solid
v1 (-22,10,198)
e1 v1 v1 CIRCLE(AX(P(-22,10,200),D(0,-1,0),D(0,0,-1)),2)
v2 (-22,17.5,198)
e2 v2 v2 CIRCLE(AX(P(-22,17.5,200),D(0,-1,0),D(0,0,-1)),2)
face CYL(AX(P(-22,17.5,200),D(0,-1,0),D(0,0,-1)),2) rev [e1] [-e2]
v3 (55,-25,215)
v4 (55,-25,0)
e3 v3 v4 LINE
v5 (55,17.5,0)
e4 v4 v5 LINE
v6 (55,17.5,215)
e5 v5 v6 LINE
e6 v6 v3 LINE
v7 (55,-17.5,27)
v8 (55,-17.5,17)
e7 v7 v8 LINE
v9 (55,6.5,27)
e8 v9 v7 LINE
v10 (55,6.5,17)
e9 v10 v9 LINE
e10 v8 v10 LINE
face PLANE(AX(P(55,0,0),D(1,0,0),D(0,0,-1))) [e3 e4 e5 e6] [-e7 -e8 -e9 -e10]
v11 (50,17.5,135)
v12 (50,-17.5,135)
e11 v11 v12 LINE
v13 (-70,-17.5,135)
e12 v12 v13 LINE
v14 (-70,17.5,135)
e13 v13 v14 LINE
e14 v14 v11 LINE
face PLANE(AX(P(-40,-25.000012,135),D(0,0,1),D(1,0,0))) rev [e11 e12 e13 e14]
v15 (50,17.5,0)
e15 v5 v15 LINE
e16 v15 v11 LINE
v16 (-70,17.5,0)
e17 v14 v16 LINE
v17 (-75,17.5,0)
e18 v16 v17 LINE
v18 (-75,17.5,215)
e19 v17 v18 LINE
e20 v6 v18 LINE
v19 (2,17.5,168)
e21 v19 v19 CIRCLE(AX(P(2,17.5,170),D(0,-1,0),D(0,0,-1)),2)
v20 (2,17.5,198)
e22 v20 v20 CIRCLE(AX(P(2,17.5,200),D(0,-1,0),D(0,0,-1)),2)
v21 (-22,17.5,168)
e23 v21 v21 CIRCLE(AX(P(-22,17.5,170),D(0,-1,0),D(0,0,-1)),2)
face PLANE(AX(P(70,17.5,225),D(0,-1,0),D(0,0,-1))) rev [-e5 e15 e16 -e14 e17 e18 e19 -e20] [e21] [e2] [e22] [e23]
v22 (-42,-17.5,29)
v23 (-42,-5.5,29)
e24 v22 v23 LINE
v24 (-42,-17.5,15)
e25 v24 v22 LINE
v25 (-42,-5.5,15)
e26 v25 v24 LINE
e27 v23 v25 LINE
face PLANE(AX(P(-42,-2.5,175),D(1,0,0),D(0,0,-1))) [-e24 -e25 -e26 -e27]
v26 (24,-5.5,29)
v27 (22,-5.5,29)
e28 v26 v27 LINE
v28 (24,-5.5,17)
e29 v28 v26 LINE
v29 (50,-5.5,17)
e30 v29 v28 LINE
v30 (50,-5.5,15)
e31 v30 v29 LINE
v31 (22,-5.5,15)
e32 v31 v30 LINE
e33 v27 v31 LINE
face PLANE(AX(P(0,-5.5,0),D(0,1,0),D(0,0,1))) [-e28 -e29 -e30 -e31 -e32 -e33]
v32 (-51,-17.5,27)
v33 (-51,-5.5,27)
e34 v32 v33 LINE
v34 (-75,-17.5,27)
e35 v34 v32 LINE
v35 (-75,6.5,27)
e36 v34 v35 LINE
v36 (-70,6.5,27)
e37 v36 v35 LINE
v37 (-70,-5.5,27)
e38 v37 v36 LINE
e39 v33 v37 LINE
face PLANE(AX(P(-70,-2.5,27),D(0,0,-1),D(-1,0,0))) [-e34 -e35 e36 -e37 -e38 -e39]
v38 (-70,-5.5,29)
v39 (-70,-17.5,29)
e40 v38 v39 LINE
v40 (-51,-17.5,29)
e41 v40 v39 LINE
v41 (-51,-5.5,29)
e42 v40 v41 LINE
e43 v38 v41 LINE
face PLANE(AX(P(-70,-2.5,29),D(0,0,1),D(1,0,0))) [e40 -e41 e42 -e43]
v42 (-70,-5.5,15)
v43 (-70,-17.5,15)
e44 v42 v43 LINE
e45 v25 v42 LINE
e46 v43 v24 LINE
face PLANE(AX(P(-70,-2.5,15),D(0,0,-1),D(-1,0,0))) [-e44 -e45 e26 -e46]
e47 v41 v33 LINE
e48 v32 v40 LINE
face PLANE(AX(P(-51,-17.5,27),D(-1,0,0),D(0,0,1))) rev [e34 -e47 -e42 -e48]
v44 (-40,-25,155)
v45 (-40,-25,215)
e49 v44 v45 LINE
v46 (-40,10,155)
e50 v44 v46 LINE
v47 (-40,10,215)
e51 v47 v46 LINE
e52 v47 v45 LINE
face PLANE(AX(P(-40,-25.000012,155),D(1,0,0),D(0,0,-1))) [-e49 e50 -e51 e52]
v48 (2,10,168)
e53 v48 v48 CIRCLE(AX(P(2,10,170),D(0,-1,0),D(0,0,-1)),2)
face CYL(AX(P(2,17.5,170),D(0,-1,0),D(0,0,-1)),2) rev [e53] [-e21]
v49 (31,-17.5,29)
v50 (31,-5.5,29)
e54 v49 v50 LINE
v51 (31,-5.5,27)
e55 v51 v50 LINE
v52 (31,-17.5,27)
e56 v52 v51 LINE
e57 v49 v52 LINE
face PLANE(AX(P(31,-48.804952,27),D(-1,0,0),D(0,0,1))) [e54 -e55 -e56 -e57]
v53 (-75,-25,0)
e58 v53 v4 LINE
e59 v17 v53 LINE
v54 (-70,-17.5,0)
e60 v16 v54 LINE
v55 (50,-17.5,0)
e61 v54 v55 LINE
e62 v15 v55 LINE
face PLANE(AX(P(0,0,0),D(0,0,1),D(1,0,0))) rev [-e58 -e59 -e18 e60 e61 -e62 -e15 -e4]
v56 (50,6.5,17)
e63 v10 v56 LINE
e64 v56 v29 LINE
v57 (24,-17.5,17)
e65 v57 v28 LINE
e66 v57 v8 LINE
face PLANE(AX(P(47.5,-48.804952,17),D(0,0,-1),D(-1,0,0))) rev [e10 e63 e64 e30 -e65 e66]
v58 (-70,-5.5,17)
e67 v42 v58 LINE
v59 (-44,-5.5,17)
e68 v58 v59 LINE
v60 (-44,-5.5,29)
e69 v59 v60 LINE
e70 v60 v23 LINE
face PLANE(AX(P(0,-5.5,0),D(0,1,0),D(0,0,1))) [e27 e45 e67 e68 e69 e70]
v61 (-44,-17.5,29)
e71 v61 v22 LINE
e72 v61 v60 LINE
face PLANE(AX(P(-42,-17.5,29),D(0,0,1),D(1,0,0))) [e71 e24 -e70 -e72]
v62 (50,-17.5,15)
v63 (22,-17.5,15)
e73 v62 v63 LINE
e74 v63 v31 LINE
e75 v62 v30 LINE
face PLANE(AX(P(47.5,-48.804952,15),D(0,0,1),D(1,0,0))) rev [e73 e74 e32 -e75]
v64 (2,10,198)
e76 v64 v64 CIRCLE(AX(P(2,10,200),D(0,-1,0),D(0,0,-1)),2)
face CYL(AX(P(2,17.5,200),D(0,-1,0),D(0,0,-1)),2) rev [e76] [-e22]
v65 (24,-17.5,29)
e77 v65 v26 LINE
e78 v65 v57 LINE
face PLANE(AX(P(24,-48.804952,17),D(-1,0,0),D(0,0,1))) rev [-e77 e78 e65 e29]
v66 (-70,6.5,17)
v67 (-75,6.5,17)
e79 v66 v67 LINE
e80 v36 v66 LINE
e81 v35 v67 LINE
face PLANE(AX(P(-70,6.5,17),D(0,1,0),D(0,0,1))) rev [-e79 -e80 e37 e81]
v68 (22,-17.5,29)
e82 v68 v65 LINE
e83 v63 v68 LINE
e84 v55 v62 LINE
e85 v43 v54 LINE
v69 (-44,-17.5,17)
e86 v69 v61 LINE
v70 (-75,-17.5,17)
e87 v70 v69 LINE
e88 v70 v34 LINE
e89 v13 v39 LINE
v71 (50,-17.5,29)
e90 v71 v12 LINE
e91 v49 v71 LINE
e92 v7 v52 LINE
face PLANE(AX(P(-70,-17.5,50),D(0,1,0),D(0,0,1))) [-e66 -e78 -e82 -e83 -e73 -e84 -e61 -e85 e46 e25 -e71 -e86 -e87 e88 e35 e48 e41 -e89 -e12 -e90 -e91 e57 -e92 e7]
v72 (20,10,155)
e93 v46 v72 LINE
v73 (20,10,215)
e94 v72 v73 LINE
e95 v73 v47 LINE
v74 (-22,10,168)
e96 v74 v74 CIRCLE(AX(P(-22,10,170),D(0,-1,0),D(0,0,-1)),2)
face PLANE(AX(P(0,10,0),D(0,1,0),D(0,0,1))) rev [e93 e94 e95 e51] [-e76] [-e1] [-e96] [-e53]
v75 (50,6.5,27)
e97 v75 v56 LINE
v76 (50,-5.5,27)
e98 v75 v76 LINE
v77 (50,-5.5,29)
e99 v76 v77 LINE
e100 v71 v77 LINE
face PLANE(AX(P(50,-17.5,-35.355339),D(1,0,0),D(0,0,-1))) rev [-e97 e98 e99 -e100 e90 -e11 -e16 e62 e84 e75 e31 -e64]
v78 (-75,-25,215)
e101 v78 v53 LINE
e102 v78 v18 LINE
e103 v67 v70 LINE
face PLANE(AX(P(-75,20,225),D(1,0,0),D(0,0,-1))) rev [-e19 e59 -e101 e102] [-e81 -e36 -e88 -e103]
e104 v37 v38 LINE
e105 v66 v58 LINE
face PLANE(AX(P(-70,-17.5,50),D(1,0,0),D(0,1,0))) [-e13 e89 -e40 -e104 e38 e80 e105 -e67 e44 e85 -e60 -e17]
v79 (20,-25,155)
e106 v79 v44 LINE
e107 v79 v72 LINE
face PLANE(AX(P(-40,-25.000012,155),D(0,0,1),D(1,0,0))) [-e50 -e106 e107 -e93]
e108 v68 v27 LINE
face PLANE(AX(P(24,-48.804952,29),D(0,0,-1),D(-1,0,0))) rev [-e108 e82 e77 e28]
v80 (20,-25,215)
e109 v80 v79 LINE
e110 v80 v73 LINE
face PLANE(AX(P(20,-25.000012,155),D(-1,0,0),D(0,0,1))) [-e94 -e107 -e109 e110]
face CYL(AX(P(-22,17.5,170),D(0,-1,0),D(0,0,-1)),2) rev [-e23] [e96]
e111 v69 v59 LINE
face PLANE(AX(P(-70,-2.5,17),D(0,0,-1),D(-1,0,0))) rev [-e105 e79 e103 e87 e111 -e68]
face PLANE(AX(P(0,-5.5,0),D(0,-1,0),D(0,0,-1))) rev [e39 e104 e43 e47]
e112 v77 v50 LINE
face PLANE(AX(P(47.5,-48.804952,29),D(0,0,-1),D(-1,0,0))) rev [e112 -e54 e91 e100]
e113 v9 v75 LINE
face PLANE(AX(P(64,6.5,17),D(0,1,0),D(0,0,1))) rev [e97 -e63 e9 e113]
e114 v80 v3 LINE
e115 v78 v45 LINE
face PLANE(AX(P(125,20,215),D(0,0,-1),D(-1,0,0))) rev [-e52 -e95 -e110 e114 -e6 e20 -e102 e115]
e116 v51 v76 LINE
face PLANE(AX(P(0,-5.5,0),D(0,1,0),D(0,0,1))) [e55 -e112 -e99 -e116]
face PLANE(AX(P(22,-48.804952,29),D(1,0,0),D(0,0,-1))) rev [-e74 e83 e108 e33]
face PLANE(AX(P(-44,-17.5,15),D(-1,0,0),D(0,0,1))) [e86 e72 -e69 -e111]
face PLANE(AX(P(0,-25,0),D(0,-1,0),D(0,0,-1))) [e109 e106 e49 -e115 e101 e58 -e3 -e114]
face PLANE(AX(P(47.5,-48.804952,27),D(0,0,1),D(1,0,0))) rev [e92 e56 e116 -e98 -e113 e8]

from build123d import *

# Parameters (mm, degrees)
SKETCH2_W                = 150
SKETCH2_H                = 40
BOSS_EXTRUDE1_DEPTH      = 225
SKETCH3_W                = 140
SKETCH3_H                = 35
CUT_EXTRUDE1_DEPTH       = 50
SKETCH4_W                = 26
SKETCH4_H                = 2
SKETCH4_W_2              = 20
BOSS_EXTRUDE2_DEPTH      = 15
SKETCH6_W                = 10
SKETCH6_H                = 15
CUT_EXTRUDE2_DEPTH       = 15
CUT_EXTRUDE3_DEPTH       = 67
SKETCH9_W                = 10
SKETCH9_H                = 15
CUT_EXTRUDE4_DEPTH       = 67
SKETCH12_W               = 14
SKETCH12_H               = 2
BOSS_EXTRUDE3_DEPTH      = 2.5
FILLET1_R                = 0.5
MIRROR3_START            = 196
MIRROR3_DEPTH            = 14
MIRROR3_START_2          = 15
MIRROR3_2_DEPTH          = 14
MIRROR3_3_DEPTH          = 2
MIRROR3_START_3          = 208
MIRROR3_4_DEPTH          = 2
MIRROR3_5_DEPTH          = 2
MIRROR3_START_4          = 27
MIRROR3_6_DEPTH          = 2
SKETCH16_W               = 32.5
SKETCH16_H               = 11.5
BOSS_EXTRUDE5_DEPTH      = 5
SKETCH17_R               = 1
BOSS_EXTRUDE7_DEPTH      = 25
SKETCH18_W               = 5
SKETCH18_H               = 50
SKETCH18_W_2             = 10
SKETCH18_H_2             = 5
BOSS_EXTRUDE8_DEPTH      = 7.5
SKETCH24_W               = 5.5
SKETCH24_H               = 28
BOSS_EXTRUDE11_DEPTH     = 50
SKETCH25_W               = 5
SKETCH25_H               = 28
BOSS_EXTRUDE12_DEPTH     = 190
SKETCH26_W               = 5
SKETCH26_H               = 28
BOSS_EXTRUDE13_DEPTH     = 190
SKETCH27_R               = 2.55
BOSS_EXTRUDE14_DEPTH     = 10
SKETCH29_W               = 10
SKETCH29_H               = 15
CUT_EXTRUDE5_DEPTH       = 19
SKETCH30_W               = 15
SKETCH30_H               = 20
BOSS_EXTRUDE15_DEPTH     = 7.5
SKETCH33_W               = 140
SKETCH33_H               = 35
BOSS_EXTRUDE16_DEPTH     = 50
BOSS_EXTRUDE18_DEPTH     = 5
CUT_EXTRUDE9_DEPTH       = 303.293317822
CUT_EXTRUDE9_DEPTH_BACK  = 303.293317822
SKETCH37_W               = 10
SKETCH37_H               = 45
SKETCH41_W               = 150
SKETCH41_H               = 50
CUT_EXTRUDE12_DEPTH      = 2.5
SKETCH42_W               = 2
SKETCH42_H               = 12
CUT_EXTRUDE13_DEPTH      = 15
SKETCH43_W               = 1
SKETCH43_H               = 2
CUT_EXTRUDE14_DEPTH      = 15
SKETCH44_W               = 10
SKETCH44_H               = 3
BOSS_EXTRUDE19_DEPTH     = 5
SKETCH45_W               = 10
SKETCH45_H               = 3
BOSS_EXTRUDE20_DEPTH     = 5
SKETCH46_W               = 65.791508331
SKETCH46_H               = 202.821994136
SKETCH46_W_2             = 83.130638558
CUT_EXTRUDE15_DEPTH      = 257.527288997
SKETCH50_W               = 14
SKETCH50_H               = 2
CUT_EXTRUDE18_DEPTH      = 2.5
SKETCH51_W               = 2
SKETCH51_H               = 14
BOSS_EXTRUDE21_DEPTH     = 15
SKETCH52_W               = 19
SKETCH52_H               = 2
CUT_EXTRUDE19_DEPTH      = 3
SKETCH53_W               = 10
SKETCH53_H               = 12
CUT_EXTRUDE20_DEPTH      = 5
SKETCH54_W               = 14
SKETCH54_H               = 2
CUT_EXTRUDE21_DEPTH      = 2.5
SKETCH55_W               = 1.5
SKETCH55_H               = 2
CUT_EXTRUDE22_DEPTH      = 15
SKETCH56_W               = 2
SKETCH56_H               = 14
BOSS_EXTRUDE22_DEPTH     = 15
SKETCH57_W               = 17.5
SKETCH57_H               = 2
CUT_EXTRUDE23_DEPTH      = 3
SKETCH58_W               = 1.5
SKETCH58_H               = 2
BOSS_EXTRUDE23_DEPTH     = 12
SKETCH59_W               = 10
SKETCH59_H               = 12
CUT_EXTRUDE24_DEPTH      = 5
SKETCH61_W               = 150
SKETCH61_H               = 32.5
CUT_EXTRUDE26_DEPTH      = 230.360524066
SKETCH63_W               = 150
SKETCH63_H               = 165
CUT_EXTRUDE27_DEPTH      = 10
SKETCH71_W               = 215
SKETCH71_H               = 42.5
CUT_EXTRUDE28_DEPTH      = 85
BOSS_EXTRUDE26_DEPTH     = 65
SKETCH73_W               = 10
SKETCH73_H               = 15
BOSS_EXTRUDE27_DEPTH     = 5
BOSS_EXTRUDE28_REACH     = 233.815
BOSS_EXTRUDE28_START     = -3
SKETCH74_W               = 5
SKETCH74_H               = 35
BOSS_EXTRUDE29_DEPTH     = 50
SKETCH75_W               = 10
SKETCH75_H               = 24
CUT_EXTRUDE29_DEPTH      = 14
CUT_EXTRUDE30_DEPTH      = 232.638187698
CUT_EXTRUDE30_DEPTH_BACK = 232.638187698
SKETCH76_R               = 2
CUT_EXTRUDE31_START      = -40
CUT_EXTRUDE31_OUTLINE_W  = 35
CUT_EXTRUDE31_OUTLINE_H  = 60
CUT_EXTRUDE31_DEPTH      = 60
SKETCH78_W               = 120
SKETCH78_H               = 35
CUT_EXTRUDE32_DEPTH      = 85


# Read off the part's stored shape, not the designer's step: Mirror3, Cut-Extrude31
with BuildPart() as part:
    # Sketch2 → Boss-Extrude1 (new body)
    with BuildSketch(Plane.XY):
        Rectangle(SKETCH2_W, SKETCH2_H)
    extrude(amount=BOSS_EXTRUDE1_DEPTH)

    # Sketch3 → Cut-Extrude1 (cut)
    with BuildSketch(Plane.XY.offset(225)):
        Rectangle(SKETCH3_W, SKETCH3_H)
    cut_extrude1 = extrude(amount=-CUT_EXTRUDE1_DEPTH, mode=Mode.SUBTRACT)

    # Sketch4 → Boss-Extrude2 (add)
    with BuildSketch(Plane(origin=(0, -17.5, 0), x_dir=(1, 0, 0), z_dir=(0, 1, 0))):
        Polygon((-42, -196), (-44, -196), (-44, -208), (-44, -210), (-42, -210), align=None)
        with Locations((-57, -209)):
            Rectangle(SKETCH4_W, SKETCH4_H)
        with Locations((-60, -197)):
            Rectangle(SKETCH4_W_2, SKETCH4_H)
        Polygon((70, -210), (70, -208), (44, -208), (44, -196), (42, -196), (42, -210), (44, -210), align=None)
        with Locations((60, -197)):
            Rectangle(SKETCH4_W_2, SKETCH4_H)
    boss_extrude2 = extrude(amount=BOSS_EXTRUDE2_DEPTH)

    # Sketch6 → Cut-Extrude2 (cut)
    with BuildSketch(Plane(origin=(-70, 0, 0), x_dir=(0, 0, -1), z_dir=(1, 0, 0))):
        with Locations((-203, -10)):
            Rectangle(SKETCH6_W, SKETCH6_H)
    cut_extrude2 = extrude(amount=-CUT_EXTRUDE2_DEPTH, mode=Mode.SUBTRACT)

    # Sketch8 → Cut-Extrude3 (cut)
    with BuildSketch(Plane(origin=(0, -17.5, 0), x_dir=(1, 0, 0), z_dir=(0, 1, 0))):
        with BuildLine():
            Line((-64.5, -179.5), (-49.5, -179.5))
            ThreePointArc((-49.5, -179.5), (-46, -183), (-49.5, -186.5))
            Line((-49.5, -186.5), (-64.5, -186.5))
            ThreePointArc((-64.5, -186.5), (-68, -183), (-64.5, -179.5))
        make_face()
        with BuildLine():
            Line((64.5, -179.5), (49.5, -179.5))
            ThreePointArc((49.5, -179.5), (46, -183), (49.5, -186.5))
            Line((49.5, -186.5), (64.5, -186.5))
            ThreePointArc((64.5, -186.5), (68, -183), (64.5, -179.5))
        make_face()
    cut_extrude3 = extrude(amount=CUT_EXTRUDE3_DEPTH, mode=Mode.SUBTRACT)

    # Sketch9 → Cut-Extrude4 (cut)
    with BuildSketch(Plane.ZY.offset(-70)):
        with Locations((203, -10)):
            Rectangle(SKETCH9_W, SKETCH9_H)
    cut_extrude4 = extrude(amount=-CUT_EXTRUDE4_DEPTH, mode=Mode.SUBTRACT)

    # Mirror1: Cut-Extrude1, Boss-Extrude2, Cut-Extrude2, Cut-Extrude3, Cut-Extrude4 across plane
    add(cut_extrude1.mirror(Plane.XY.offset(112.5)), mode=Mode.SUBTRACT)
    add(boss_extrude2.mirror(Plane.XY.offset(112.5)))
    add(cut_extrude2.mirror(Plane.XY.offset(112.5)), mode=Mode.SUBTRACT)
    add(cut_extrude3.mirror(Plane.XY.offset(112.5)), mode=Mode.SUBTRACT)
    add(cut_extrude4.mirror(Plane.XY.offset(112.5)), mode=Mode.SUBTRACT)

    # Sketch12 → Boss-Extrude3 (add)
    with BuildSketch(Plane.ZY.offset(-70)):
        with Locations((22, -1.5)):
            Rectangle(SKETCH12_W, SKETCH12_H)
    extrude(amount=BOSS_EXTRUDE3_DEPTH)

    # Fillet1
    fillet1_edges = [part.edges().sort_by_distance(p)[0] for p in [
        (67.5, -2.5, 22),
    ]]
    fillet(fillet1_edges, radius=FILLET1_R)

    # Mirror3 outline → Mirror3 (add)
    with BuildSketch(Plane.XY.offset(MIRROR3_START)):
        with BuildLine():
            Line((-70, -2.5), (-68, -2.5))
            ThreePointArc((-68, -2.5), (-67.646446609, -2.353553391), (-67.5, -2))
            Line((-67.5, -2), (-67.5, -0.5))
            Line((-67.5, -0.5), (-70, -0.5))
            Line((-70, -0.5), (-70, -2.5))
        make_face()
        with BuildLine():
            Line((68, -2.5), (70, -2.5))
            Line((70, -2.5), (70, -0.5))
            Line((70, -0.5), (67.5, -0.5))
            Line((67.5, -0.5), (67.5, -2))
            ThreePointArc((67.5, -2), (67.646446609, -2.353553391), (68, -2.5))
        make_face()
    extrude(amount=MIRROR3_DEPTH)

    # Mirror3 2 outline → Mirror3 2 (add)
    with BuildSketch(Plane.XY.offset(MIRROR3_START_2)):
        with BuildLine():
            Line((-70, -2.5), (-68, -2.5))
            ThreePointArc((-68, -2.5), (-67.646446609, -2.353553391), (-67.5, -2))
            Line((-67.5, -2), (-67.5, -0.5))
            Line((-67.5, -0.5), (-70, -0.5))
            Line((-70, -0.5), (-70, -2.5))
        make_face()
    extrude(amount=MIRROR3_2_DEPTH)

    # Mirror3 3 outline → Mirror3 3 (add)
    with BuildSketch(Plane.XY.offset(MIRROR3_START)):
        with BuildLine():
            ThreePointArc((-67.5, -2), (-67.646446609, -2.353553391), (-68, -2.5))
            Line((-68, -2.5), (-67.5, -2.5))
            Line((-67.5, -2.5), (-67.5, -2))
        make_face()
        with BuildLine():
            Line((67.5, -2.5), (68, -2.5))
            ThreePointArc((68, -2.5), (67.646446609, -2.353553391), (67.5, -2))
            Line((67.5, -2), (67.5, -2.5))
        make_face()
    extrude(amount=MIRROR3_3_DEPTH)

    # Mirror3 4 outline → Mirror3 4 (add)
    with BuildSketch(Plane.XY.offset(MIRROR3_START_3)):
        with BuildLine():
            ThreePointArc((-67.5, -2), (-67.646446609, -2.353553391), (-68, -2.5))
            Line((-68, -2.5), (-67.5, -2.5))
            Line((-67.5, -2.5), (-67.5, -2))
        make_face()
        with BuildLine():
            Line((67.5, -2.5), (68, -2.5))
            ThreePointArc((68, -2.5), (67.646446609, -2.353553391), (67.5, -2))
            Line((67.5, -2), (67.5, -2.5))
        make_face()
    extrude(amount=MIRROR3_4_DEPTH)

    # Mirror3 5 outline → Mirror3 5 (add)
    with BuildSketch(Plane.XY.offset(MIRROR3_START_2)):
        with BuildLine():
            ThreePointArc((-67.5, -2), (-67.646446609, -2.353553391), (-68, -2.5))
            Line((-68, -2.5), (-67.5, -2.5))
            Line((-67.5, -2.5), (-67.5, -2))
        make_face()
    extrude(amount=MIRROR3_5_DEPTH)

    # Mirror3 6 outline → Mirror3 6 (add)
    with BuildSketch(Plane.XY.offset(MIRROR3_START_4)):
        with BuildLine():
            ThreePointArc((-67.5, -2), (-67.646446609, -2.353553391), (-68, -2.5))
            Line((-68, -2.5), (-67.5, -2.5))
            Line((-67.5, -2.5), (-67.5, -2))
        make_face()
    extrude(amount=MIRROR3_6_DEPTH)

    # Sketch16 → Boss-Extrude5 (add)
    with BuildSketch(Plane(origin=(-70, 0, 0), x_dir=(0, 0, -1), z_dir=(1, 0, 0))):
        with Locations((16.25, -14.25)):
            Rectangle(SKETCH16_W, SKETCH16_H)
    boss_extrude5 = extrude(amount=-BOSS_EXTRUDE5_DEPTH)

    # Mirror4: Boss-Extrude5 across plane
    add(boss_extrude5.mirror(Plane(origin=(0, 0, 0), x_dir=(0, 0, 1), z_dir=(1, 0, 0))))

    # Sketch17 → Boss-Extrude7 (add)
    with BuildSketch(Plane.ZY.offset(-70)):
        with Locations(Location((-29.5, -14.25, 0), (0, 0, 270))):
            Circle(SKETCH17_R)
        with Locations(Location((-3, -14.25, 0), (0, 0, 270))):
            Circle(SKETCH17_R)
    boss_extrude7 = extrude(amount=BOSS_EXTRUDE7_DEPTH)

    # Mirror5: Boss-Extrude7 across plane
    add(boss_extrude7.mirror(Plane(origin=(0, 0, 0), x_dir=(0, 0, 1), z_dir=(1, 0, 0))))

    # Sketch18 → Boss-Extrude8 (add)
    with BuildSketch(Plane(origin=(0, 20, 0), x_dir=(1, 0, 0), z_dir=(0, 1, 0))):
        with Locations((-67.5, -80.5)):
            Rectangle(SKETCH18_W, SKETCH18_H)
        with Locations((67.5, -144.5)):
            Rectangle(SKETCH18_W, SKETCH18_H)
        with Locations((-30, -172)):
            Rectangle(SKETCH18_W_2, SKETCH18_H_2)
        with Locations((-30, -117)):
            Rectangle(SKETCH18_W_2, SKETCH18_H_2)
        with Locations((30, -108)):
            Rectangle(SKETCH18_W_2, SKETCH18_H_2)
        with Locations((30, -53)):
            Rectangle(SKETCH18_W_2, SKETCH18_H_2)
    extrude(amount=BOSS_EXTRUDE8_DEPTH)

    # Sketch24 → Boss-Extrude11 (add)
    with BuildSketch(Plane.ZY.offset(75)):
        with Locations((84.75, -6)):
            Rectangle(SKETCH24_W, SKETCH24_H)
    boss_extrude11 = extrude(amount=BOSS_EXTRUDE11_DEPTH)

    # Sketch25 → Boss-Extrude12 (add)
    with BuildSketch(Plane(origin=(0, 0, 82), x_dir=(-1, 0, 0), z_dir=(0, 0, -1))):
        with Locations((122.5, -6)):
            Rectangle(SKETCH25_W, SKETCH25_H)
    extrude(amount=BOSS_EXTRUDE12_DEPTH)

    # Mirror12: Boss-Extrude11 across plane
    add(boss_extrude11.mirror(Plane(origin=(0, 0, 0), x_dir=(0, 0, 1), z_dir=(1, 0, 0))))

    # Sketch26 → Boss-Extrude13 (add)
    with BuildSketch(Plane(origin=(0, 0, 82), x_dir=(-1, 0, 0), z_dir=(0, 0, -1))):
        with Locations((-122.5, -6)):
            Rectangle(SKETCH26_W, SKETCH26_H)
    extrude(amount=BOSS_EXTRUDE13_DEPTH)

    # Sketch27 → Boss-Extrude14 (add)
    with BuildSketch(Plane.ZY.offset(-120)):
        with Locations(Location((-100.5, -6, 0), (0, 0, 180))):
            Circle(SKETCH27_R)
    extrude(amount=BOSS_EXTRUDE14_DEPTH)

    # Sketch29 → Cut-Extrude5 (cut)
    with BuildSketch(Plane.ZY.offset(125)):
        with Locations((-100.5, -6)):
            Rectangle(SKETCH29_W, SKETCH29_H)
    extrude(amount=-CUT_EXTRUDE5_DEPTH, mode=Mode.SUBTRACT)

    # Sketch30 → Boss-Extrude15 (add)
    with BuildSketch(Plane.ZY.offset(125)):
        with Locations((-100.5, -6)):
            Rectangle(SKETCH30_W, SKETCH30_H)
    extrude(amount=BOSS_EXTRUDE15_DEPTH)

    # Sketch33 → Boss-Extrude16 (add)
    with BuildSketch(Plane.XY.offset(175)):
        Rectangle(SKETCH33_W, SKETCH33_H)
    extrude(amount=BOSS_EXTRUDE16_DEPTH)

    # Sketch36 → Boss-Extrude18 (add)
    with BuildSketch(Plane.XZ.offset(20)):
        Polygon((-75, 225), (-75, 87.5), (-125, 87.5), (-125, -108), (-120, -108), (-120, 82), (-75, 82), (-75, -32.5), (-70, -32.5), (-70, 0), (70, 0), (70, -32.5), (75, -32.5), (75, 82), (120, 82), (120, -108), (125, -108), (125, 87.5), (75, 87.5), (75, 225), align=None)
    extrude(amount=BOSS_EXTRUDE18_DEPTH)

    # Sketch37 → Cut-Extrude9 (cut, two sides: drawn at the far end of the back side and taken through both)
    with BuildSketch(Plane.ZY.offset(75).offset(-CUT_EXTRUDE9_DEPTH_BACK)):
        with Locations((220, -2.5)):
            Rectangle(SKETCH37_W, SKETCH37_H)
    extrude(amount=CUT_EXTRUDE9_DEPTH + CUT_EXTRUDE9_DEPTH_BACK, mode=Mode.SUBTRACT)

    # Sketch41 → Cut-Extrude12 (cut)
    with BuildSketch(Plane(origin=(0, 20, 0), x_dir=(1, 0, 0), z_dir=(0, 1, 0))):
        with Locations((0, -25)):
            Rectangle(SKETCH41_W, SKETCH41_H)
    extrude(amount=-CUT_EXTRUDE12_DEPTH, mode=Mode.SUBTRACT)

    # Sketch42 → Cut-Extrude13 (cut)
    with BuildSketch(Plane(origin=(0, -2.5, 0), x_dir=(1, 0, 0), z_dir=(0, 1, 0))):
        with Locations((-43, -23)):
            Rectangle(SKETCH42_W, SKETCH42_H)
        with Locations((43, -23)):
            Rectangle(SKETCH42_W, SKETCH42_H)
    extrude(amount=-CUT_EXTRUDE13_DEPTH, mode=Mode.SUBTRACT)

    # Sketch43 → Cut-Extrude14 (cut)
    with BuildSketch(Plane(origin=(0, -2.5, 0), x_dir=(1, 0, 0), z_dir=(0, 1, 0))):
        with Locations((-50.5, -28)):
            Rectangle(SKETCH43_W, SKETCH43_H)
        with Locations((50.5, -28)):
            Rectangle(SKETCH43_W, SKETCH43_H)
    extrude(amount=-CUT_EXTRUDE14_DEPTH, mode=Mode.SUBTRACT)

    # Sketch44 → Boss-Extrude19 (add)
    with BuildSketch(Plane.ZY.offset(75)):
        with Locations((22, -4)):
            Rectangle(SKETCH44_W, SKETCH44_H)
    extrude(amount=-BOSS_EXTRUDE19_DEPTH)

    # Sketch45 → Boss-Extrude20 (add)
    with BuildSketch(Plane(origin=(75, 0, 0), x_dir=(0, 0, -1), z_dir=(1, 0, 0))):
        with Locations((-22, -4)):
            Rectangle(SKETCH45_W, SKETCH45_H)
    extrude(amount=-BOSS_EXTRUDE20_DEPTH)

    # Sketch46 → Cut-Extrude15 (cut, through all)
    with BuildSketch(Plane(origin=(0, 20, 0), x_dir=(1, 0, 0), z_dir=(0, 1, 0))):
        with Locations((107.895754166, 13.910997068)):
            Rectangle(SKETCH46_W, SKETCH46_H)
        with Locations((-116.565319279, 13.910997068)):
            Rectangle(SKETCH46_W_2, SKETCH46_H)
    extrude(amount=-CUT_EXTRUDE15_DEPTH, mode=Mode.SUBTRACT)

    # Sketch50 → Cut-Extrude18 (cut)
    with BuildSketch(Plane(origin=(-67.5, 0, 0), x_dir=(0, 0, -1), z_dir=(1, 0, 0))):
        with Locations((-22, -1.5)):
            Rectangle(SKETCH50_W, SKETCH50_H)
    extrude(amount=-CUT_EXTRUDE18_DEPTH, mode=Mode.SUBTRACT)

    # Sketch51 → Boss-Extrude21 (add)
    with BuildSketch(Plane(origin=(0, -2.5, 0), x_dir=(1, 0, 0), z_dir=(0, 1, 0))):
        with Locations((-43, -22)):
            Rectangle(SKETCH51_W, SKETCH51_H)
    extrude(amount=-BOSS_EXTRUDE21_DEPTH)

    # Sketch52 → Cut-Extrude19 (cut)
    with BuildSketch(Plane(origin=(0, -2.5, 0), x_dir=(1, 0, 0), z_dir=(0, 1, 0))):
        with Locations((-60.5, -28)):
            Rectangle(SKETCH52_W, SKETCH52_H)
        Polygon((-70, -15), (-44, -15), (-42, -15), (-42, -29), (-44, -29), (-44, -17), (-70, -17), align=None)
    extrude(amount=-CUT_EXTRUDE19_DEPTH, mode=Mode.SUBTRACT)

    # Sketch53 → Cut-Extrude20 (cut)
    with BuildSketch(Plane.ZY.offset(75)):
        with Locations((22, 0.5)):
            Rectangle(SKETCH53_W, SKETCH53_H)
    extrude(amount=-CUT_EXTRUDE20_DEPTH, mode=Mode.SUBTRACT)

    # Sketch54 → Cut-Extrude21 (cut)
    with BuildSketch(Plane.ZY.offset(-67.5)):
        with Locations((22, -1.5)):
            Rectangle(SKETCH54_W, SKETCH54_H)
    extrude(amount=-CUT_EXTRUDE21_DEPTH, mode=Mode.SUBTRACT)

    # Sketch55 → Cut-Extrude22 (cut)
    with BuildSketch(Plane(origin=(0, -2.5, 0), x_dir=(1, 0, 0), z_dir=(0, 1, 0))):
        with Locations((51.75, -28)):
            Rectangle(SKETCH55_W, SKETCH55_H)
    extrude(amount=-CUT_EXTRUDE22_DEPTH, mode=Mode.SUBTRACT)

    # Sketch56 → Boss-Extrude22 (add)
    with BuildSketch(Plane(origin=(0, -2.5, 0), x_dir=(1, 0, 0), z_dir=(0, 1, 0))):
        with Locations((43, -22)):
            Rectangle(SKETCH56_W, SKETCH56_H)
    extrude(amount=-BOSS_EXTRUDE22_DEPTH)

    # Sketch57 → Cut-Extrude23 (cut)
    with BuildSketch(Plane(origin=(0, -2.5, 0), x_dir=(1, 0, 0), z_dir=(0, 1, 0))):
        Polygon((70, -15), (44, -15), (42, -15), (42, -29), (44, -29), (44, -17), (70, -17), align=None)
        with Locations((61.25, -28)):
            Rectangle(SKETCH57_W, SKETCH57_H)
    extrude(amount=-CUT_EXTRUDE23_DEPTH, mode=Mode.SUBTRACT)

    # Sketch58 → Boss-Extrude23 (add)
    with BuildSketch(Plane(origin=(0, -5.5, 0), x_dir=(1, 0, 0), z_dir=(0, 1, 0))):
        with Locations((51.75, -28)):
            Rectangle(SKETCH58_W, SKETCH58_H)
    extrude(amount=-BOSS_EXTRUDE23_DEPTH)

    # Sketch59 → Cut-Extrude24 (cut)
    with BuildSketch(Plane(origin=(75, 0, 0), x_dir=(0, 0, -1), z_dir=(1, 0, 0))):
        with Locations((-22, 0.5)):
            Rectangle(SKETCH59_W, SKETCH59_H)
    extrude(amount=-CUT_EXTRUDE24_DEPTH, mode=Mode.SUBTRACT)

    # Sketch61 → Cut-Extrude26 (cut, through all)
    with BuildSketch(Plane(origin=(0, 0, 0), x_dir=(1, 0, 0), z_dir=(0, 1, 0))):
        with Locations((0, 16.25)):
            Rectangle(SKETCH61_W, SKETCH61_H)
    extrude(amount=-CUT_EXTRUDE26_DEPTH, mode=Mode.SUBTRACT)

    # Sketch63 → Cut-Extrude27 (cut)
    with BuildSketch(Plane(origin=(0, 27.5, 0), x_dir=(1, 0, 0), z_dir=(0, 1, 0))):
        with Locations((0, -132.5)):
            Rectangle(SKETCH63_W, SKETCH63_H)
    extrude(amount=-CUT_EXTRUDE27_DEPTH, mode=Mode.SUBTRACT)

    # Sketch71 → Cut-Extrude28 (cut)
    with BuildSketch(Plane(origin=(75, 0, 0), x_dir=(0, 0, -1), z_dir=(1, 0, 0))):
        with Locations((-107.5, -3.75)):
            Rectangle(SKETCH71_W, SKETCH71_H)
    extrude(amount=-CUT_EXTRUDE28_DEPTH, mode=Mode.SUBTRACT)

    # Sketch72 → Boss-Extrude26 (add)
    with BuildSketch(Plane(origin=(-10, 0, 0), x_dir=(0, 0, -1), z_dir=(1, 0, 0))):
        Polygon((0, -17.5), (-50, -17.5), (-50, 17.5), (-215, 17.5), (-215, -25), (0, -25), align=None)
    extrude(amount=BOSS_EXTRUDE26_DEPTH)

    # Sketch73 → Boss-Extrude27 (add)
    with BuildSketch(Plane.ZY.offset(70)):
        with Locations((203, -10)):
            Rectangle(SKETCH73_W, SKETCH73_H)
    extrude(amount=BOSS_EXTRUDE27_DEPTH)

    # Sketch23 → Boss-Extrude28 (add, up to next)
    with BuildSketch(Plane(origin=(0, -2.5, 0), x_dir=(1, 0, 0), z_dir=(0, 1, 0)).offset(BOSS_EXTRUDE28_START), mode=Mode.PRIVATE) as boss_extrude28_sk1:
        Polygon((31, -27), (31, -29), (47.5, -29), (50, -29), (50, -27), (47.5, -27), align=None)
    boss_extrude28_tool1 = extrude(boss_extrude28_sk1.sketch, amount=-BOSS_EXTRUDE28_REACH, mode=Mode.PRIVATE) - part.part
    # Sketch23 → Boss-Extrude28 (add, up to next)
    with BuildSketch(Plane(origin=(0, -2.5, 0), x_dir=(1, 0, 0), z_dir=(0, 1, 0)).offset(BOSS_EXTRUDE28_START), mode=Mode.PRIVATE) as boss_extrude28_sk2:
        Polygon((50, -17), (47.5, -17), (24, -17), (24, -29), (22, -29), (22, -15), (47.5, -15), (50, -15), align=None)
    boss_extrude28_tool2 = extrude(boss_extrude28_sk2.sketch, amount=-BOSS_EXTRUDE28_REACH, mode=Mode.PRIVATE) - part.part
    add(boss_extrude28_tool1.solids().sort_by_distance((40.5, -5.5, 28))[0])
    add(boss_extrude28_tool2.solids().sort_by_distance((48.75, -5.5, 16.68695))[0])

    # Sketch74 → Boss-Extrude29 (add)
    with BuildSketch(Plane(origin=(0, 0, 50), x_dir=(-1, 0, 0), z_dir=(0, 0, -1))):
        with Locations((-52.5, 0)):
            Rectangle(SKETCH74_W, SKETCH74_H)
    extrude(amount=BOSS_EXTRUDE29_DEPTH)

    # Sketch75 → Cut-Extrude29 (cut)
    with BuildSketch(Plane.ZY.offset(-50)):
        with Locations((22, -5.5)):
            Rectangle(SKETCH75_W, SKETCH75_H)
    extrude(amount=-CUT_EXTRUDE29_DEPTH, mode=Mode.SUBTRACT)

    # Sketch76 → Cut-Extrude30 (cut, two sides: drawn at the far end of the back side and taken through both)
    with BuildSketch(Plane.XZ.offset(25).offset(-CUT_EXTRUDE30_DEPTH_BACK)):
        with Locations(Location((2, 170, 0), (0, 0, 270))):
            Circle(SKETCH76_R)
        with Locations(Location((-22, 170, 0), (0, 0, 270))):
            Circle(SKETCH76_R)
        with Locations(Location((-22, 200, 0), (0, 0, 270))):
            Circle(SKETCH76_R)
        with Locations(Location((2, 200, 0), (0, 0, 270))):
            Circle(SKETCH76_R)
    extrude(amount=CUT_EXTRUDE30_DEPTH + CUT_EXTRUDE30_DEPTH_BACK, mode=Mode.SUBTRACT)

    # Cut-Extrude31 outline → Cut-Extrude31 (cut)
    with BuildSketch(Plane.YZ.offset(CUT_EXTRUDE31_START)):
        with Locations((-7.5, 185)):
            Rectangle(CUT_EXTRUDE31_OUTLINE_W, CUT_EXTRUDE31_OUTLINE_H)
    extrude(amount=CUT_EXTRUDE31_DEPTH, mode=Mode.SUBTRACT)

    # Sketch78 → Cut-Extrude32 (cut)
    with BuildSketch(Plane(origin=(0, 0, 50), x_dir=(-1, 0, 0), z_dir=(0, 0, -1))):
        with Locations((10, 0)):
            Rectangle(SKETCH78_W, SKETCH78_H)
    extrude(amount=-CUT_EXTRUDE32_DEPTH, mode=Mode.SUBTRACT)


solid = part.part
